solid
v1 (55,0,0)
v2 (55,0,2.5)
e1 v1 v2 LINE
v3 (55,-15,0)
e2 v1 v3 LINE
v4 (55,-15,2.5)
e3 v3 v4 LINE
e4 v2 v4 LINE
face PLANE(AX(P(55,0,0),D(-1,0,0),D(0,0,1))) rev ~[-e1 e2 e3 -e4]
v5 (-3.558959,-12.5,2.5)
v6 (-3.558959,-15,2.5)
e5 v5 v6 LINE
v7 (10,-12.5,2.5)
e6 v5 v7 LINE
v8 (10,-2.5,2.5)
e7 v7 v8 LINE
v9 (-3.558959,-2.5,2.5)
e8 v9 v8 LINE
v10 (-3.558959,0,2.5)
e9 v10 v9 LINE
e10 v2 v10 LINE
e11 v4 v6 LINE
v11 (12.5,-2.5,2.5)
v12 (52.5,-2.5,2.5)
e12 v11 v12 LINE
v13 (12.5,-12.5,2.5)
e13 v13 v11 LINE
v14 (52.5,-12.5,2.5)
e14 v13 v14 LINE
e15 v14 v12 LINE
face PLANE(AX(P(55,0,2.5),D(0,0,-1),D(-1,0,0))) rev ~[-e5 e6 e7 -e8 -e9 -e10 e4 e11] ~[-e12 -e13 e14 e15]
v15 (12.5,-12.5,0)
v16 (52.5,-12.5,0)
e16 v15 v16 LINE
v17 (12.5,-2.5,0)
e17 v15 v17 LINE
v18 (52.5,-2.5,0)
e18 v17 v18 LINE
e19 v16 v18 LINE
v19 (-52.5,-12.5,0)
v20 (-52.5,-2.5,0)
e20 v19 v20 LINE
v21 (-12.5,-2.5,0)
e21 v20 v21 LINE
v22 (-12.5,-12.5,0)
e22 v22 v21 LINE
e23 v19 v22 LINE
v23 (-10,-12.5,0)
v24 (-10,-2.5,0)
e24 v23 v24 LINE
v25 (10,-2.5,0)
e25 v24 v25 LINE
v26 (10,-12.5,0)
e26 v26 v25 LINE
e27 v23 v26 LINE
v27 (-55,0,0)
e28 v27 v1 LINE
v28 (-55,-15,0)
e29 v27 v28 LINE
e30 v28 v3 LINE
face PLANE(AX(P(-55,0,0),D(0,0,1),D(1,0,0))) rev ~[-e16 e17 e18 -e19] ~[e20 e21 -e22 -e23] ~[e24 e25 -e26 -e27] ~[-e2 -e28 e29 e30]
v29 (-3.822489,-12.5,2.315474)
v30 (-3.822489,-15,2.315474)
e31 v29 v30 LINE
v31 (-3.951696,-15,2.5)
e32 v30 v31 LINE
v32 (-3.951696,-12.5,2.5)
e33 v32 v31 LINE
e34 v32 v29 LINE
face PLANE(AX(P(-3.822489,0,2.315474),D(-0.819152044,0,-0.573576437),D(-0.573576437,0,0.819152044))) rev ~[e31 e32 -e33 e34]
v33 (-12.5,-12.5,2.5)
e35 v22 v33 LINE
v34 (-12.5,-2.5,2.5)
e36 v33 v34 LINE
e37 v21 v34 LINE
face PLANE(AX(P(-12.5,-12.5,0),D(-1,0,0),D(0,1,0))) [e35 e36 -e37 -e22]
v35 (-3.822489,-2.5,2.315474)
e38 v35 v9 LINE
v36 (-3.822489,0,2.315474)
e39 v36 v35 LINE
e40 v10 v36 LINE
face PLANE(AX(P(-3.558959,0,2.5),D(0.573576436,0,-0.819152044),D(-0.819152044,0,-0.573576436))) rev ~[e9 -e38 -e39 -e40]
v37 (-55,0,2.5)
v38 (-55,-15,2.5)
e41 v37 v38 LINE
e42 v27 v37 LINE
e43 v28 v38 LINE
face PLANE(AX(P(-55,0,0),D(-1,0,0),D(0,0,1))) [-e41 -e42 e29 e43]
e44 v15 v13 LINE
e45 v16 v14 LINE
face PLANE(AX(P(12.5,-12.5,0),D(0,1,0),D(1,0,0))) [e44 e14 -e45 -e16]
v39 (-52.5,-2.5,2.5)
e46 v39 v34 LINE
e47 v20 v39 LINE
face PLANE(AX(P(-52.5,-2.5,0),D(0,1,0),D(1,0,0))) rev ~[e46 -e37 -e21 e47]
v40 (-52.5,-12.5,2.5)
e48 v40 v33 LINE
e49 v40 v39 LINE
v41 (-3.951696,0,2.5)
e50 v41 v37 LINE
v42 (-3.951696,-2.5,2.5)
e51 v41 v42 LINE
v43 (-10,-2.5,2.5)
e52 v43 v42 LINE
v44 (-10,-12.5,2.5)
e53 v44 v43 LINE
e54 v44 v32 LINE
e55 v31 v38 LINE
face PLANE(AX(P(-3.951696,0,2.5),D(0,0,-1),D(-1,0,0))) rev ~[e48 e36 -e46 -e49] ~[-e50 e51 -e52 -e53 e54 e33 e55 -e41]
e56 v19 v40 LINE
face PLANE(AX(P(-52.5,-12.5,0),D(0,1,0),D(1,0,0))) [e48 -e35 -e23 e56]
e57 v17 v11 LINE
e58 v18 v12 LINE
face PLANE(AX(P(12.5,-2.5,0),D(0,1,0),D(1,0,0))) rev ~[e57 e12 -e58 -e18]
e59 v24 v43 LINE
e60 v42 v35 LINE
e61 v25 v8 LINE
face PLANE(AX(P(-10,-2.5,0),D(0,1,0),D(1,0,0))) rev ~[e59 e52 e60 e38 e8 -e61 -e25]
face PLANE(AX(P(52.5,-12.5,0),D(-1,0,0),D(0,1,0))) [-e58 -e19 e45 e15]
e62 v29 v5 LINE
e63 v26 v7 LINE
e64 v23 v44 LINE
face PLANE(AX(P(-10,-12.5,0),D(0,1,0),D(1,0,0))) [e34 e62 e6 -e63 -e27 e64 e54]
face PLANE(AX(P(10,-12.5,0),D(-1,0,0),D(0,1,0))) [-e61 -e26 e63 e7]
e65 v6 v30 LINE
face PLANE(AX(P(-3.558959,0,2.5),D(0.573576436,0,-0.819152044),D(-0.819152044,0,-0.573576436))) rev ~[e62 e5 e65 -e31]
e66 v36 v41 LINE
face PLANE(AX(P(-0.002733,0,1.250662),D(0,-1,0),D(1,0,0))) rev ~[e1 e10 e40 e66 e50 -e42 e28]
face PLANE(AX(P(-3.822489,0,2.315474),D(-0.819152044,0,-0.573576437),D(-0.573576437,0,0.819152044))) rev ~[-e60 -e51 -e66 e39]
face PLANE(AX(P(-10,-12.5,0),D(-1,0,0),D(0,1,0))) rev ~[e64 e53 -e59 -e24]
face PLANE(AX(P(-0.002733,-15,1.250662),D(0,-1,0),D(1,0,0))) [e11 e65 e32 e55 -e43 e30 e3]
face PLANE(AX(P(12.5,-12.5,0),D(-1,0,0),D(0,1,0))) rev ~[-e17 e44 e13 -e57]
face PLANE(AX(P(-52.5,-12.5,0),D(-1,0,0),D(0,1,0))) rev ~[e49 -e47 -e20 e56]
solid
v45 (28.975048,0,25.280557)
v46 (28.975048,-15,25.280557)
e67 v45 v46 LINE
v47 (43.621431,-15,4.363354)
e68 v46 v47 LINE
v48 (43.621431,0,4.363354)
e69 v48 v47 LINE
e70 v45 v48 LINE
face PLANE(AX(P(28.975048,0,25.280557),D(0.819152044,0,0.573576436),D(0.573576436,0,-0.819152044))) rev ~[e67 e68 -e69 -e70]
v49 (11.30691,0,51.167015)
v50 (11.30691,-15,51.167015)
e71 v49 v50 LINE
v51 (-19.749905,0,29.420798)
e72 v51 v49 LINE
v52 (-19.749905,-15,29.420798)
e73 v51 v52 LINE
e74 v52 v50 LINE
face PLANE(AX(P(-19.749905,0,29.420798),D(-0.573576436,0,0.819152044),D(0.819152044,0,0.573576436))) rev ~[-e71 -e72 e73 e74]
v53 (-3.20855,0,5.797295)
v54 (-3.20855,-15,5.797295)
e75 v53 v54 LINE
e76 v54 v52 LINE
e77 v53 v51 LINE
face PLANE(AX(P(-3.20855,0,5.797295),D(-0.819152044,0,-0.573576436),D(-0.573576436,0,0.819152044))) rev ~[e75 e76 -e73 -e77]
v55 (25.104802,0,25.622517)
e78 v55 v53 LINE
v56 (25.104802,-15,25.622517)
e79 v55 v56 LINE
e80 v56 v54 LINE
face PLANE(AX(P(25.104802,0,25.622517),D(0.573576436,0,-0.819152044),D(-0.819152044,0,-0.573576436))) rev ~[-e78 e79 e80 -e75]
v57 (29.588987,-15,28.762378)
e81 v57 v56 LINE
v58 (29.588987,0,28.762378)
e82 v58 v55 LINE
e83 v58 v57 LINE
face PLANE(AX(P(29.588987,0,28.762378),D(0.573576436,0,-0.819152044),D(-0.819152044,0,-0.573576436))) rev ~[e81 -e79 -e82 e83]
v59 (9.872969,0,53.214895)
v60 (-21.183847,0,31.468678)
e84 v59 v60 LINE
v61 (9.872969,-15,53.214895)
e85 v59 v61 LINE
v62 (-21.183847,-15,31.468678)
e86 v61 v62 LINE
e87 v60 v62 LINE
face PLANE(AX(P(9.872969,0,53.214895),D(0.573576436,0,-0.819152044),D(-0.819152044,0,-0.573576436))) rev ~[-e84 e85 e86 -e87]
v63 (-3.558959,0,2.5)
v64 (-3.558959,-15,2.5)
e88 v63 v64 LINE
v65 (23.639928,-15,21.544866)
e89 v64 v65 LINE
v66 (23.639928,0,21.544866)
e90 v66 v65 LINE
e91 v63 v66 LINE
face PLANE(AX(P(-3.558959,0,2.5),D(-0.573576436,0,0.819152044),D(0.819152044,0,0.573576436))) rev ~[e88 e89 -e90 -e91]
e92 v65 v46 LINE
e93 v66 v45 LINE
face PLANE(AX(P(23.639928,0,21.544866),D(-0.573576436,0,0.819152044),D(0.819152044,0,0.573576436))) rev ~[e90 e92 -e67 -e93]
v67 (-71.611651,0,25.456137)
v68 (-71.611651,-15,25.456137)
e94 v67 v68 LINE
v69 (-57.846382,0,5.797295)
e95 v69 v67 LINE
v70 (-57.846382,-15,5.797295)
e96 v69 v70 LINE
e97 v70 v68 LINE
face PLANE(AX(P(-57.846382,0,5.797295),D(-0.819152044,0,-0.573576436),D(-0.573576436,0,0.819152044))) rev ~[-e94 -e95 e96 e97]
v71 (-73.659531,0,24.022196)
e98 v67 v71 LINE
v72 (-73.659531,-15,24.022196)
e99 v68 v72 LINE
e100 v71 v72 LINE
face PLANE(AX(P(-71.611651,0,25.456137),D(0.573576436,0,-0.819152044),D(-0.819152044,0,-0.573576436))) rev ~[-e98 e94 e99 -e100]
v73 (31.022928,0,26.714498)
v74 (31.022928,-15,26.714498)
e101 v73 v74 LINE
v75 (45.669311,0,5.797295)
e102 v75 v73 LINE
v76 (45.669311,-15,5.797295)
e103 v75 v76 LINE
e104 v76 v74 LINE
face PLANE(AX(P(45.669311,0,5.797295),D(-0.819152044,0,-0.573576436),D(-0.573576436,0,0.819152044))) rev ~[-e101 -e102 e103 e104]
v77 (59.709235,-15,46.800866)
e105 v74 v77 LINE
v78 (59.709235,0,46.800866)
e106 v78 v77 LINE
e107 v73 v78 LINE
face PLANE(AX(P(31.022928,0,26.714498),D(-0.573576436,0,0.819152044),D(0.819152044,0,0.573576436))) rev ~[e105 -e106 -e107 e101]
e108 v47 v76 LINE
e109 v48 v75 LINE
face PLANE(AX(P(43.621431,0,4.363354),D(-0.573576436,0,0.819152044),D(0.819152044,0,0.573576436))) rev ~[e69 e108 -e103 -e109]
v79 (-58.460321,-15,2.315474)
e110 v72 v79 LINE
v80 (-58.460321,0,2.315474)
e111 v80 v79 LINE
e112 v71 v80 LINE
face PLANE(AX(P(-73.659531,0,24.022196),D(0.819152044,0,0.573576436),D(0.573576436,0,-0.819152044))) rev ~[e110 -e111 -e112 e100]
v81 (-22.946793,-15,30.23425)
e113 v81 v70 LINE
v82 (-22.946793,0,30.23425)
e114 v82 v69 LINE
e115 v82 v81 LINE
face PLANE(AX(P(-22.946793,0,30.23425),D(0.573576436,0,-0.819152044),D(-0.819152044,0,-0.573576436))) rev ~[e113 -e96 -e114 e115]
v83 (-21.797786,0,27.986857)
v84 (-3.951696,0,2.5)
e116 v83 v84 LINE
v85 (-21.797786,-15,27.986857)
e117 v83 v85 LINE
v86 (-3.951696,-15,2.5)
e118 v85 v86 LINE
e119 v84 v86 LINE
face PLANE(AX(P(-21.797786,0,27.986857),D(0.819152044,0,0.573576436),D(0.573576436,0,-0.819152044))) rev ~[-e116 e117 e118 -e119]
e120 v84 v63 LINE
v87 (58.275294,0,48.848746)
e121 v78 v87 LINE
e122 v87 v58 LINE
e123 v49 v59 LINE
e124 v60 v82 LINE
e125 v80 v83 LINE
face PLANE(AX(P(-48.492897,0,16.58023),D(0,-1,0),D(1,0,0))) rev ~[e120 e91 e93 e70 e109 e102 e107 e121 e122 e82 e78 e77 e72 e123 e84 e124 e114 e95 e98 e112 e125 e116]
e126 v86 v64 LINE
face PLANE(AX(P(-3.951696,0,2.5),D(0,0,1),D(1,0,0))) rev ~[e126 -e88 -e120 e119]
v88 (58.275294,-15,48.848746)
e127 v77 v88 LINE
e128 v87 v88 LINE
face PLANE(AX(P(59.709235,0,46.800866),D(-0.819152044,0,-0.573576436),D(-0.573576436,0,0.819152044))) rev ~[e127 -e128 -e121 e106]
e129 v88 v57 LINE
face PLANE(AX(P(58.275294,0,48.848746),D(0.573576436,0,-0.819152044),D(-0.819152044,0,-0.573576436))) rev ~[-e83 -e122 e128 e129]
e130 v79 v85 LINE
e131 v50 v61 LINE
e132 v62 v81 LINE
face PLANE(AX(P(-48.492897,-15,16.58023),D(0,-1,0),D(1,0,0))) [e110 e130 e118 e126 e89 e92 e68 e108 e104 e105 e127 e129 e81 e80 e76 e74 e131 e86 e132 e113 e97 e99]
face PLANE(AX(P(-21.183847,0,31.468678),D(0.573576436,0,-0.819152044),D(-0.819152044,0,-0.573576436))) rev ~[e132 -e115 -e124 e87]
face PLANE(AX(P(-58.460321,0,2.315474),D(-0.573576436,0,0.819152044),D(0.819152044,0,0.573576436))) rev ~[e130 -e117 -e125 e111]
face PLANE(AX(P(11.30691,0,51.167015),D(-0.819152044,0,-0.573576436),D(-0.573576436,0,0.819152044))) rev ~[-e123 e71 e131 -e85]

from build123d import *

# Parameters (mm, degrees)
F1_DEPTH = 15
F0_W     = 2.5
F0_H     = 2.5
F2_W     = 20
F2_H     = 10
F2_W_2   = 40
F3_DEPTH = 70


# Not quite as in the source:
# - a feature of the source that left no trace in its solid (it failed there, or was rolled back) is left out


with BuildPart() as f1:
    # F0 (on Front) → F1 (new body)
    with BuildSketch(Plane.XZ):
        Polygon((-28.0954666037, 23.5771734984), (-21.7977855629, 27.9868572364), (-19.7499054522, 29.4207983273), (-21.1838465431, 31.468678438), (-22.9467930342, 30.2342500155), (-57.8463816277, 5.7972950019), (-71.6116508746, 25.456136839), (-73.6595309853, 24.0221957481), (-58.4603206476, 2.3154738003), align=None)
        Polygon((-21.1838465431, 31.468678438), (-19.7499054522, 29.4207983273), (11.3069104876, 51.1670149611), (9.8729693967, 53.2148950719), align=None)
        Polygon((-21.7977855629, 27.9868572364), (-3.9516960007, 2.5), (-3.5589586403, 2.5), (23.6399283018, 21.5448656678), (28.9750478761, 25.280556611), (31.0229279868, 26.7144977018), (29.588986896, 28.7623778126), (25.1048015935, 25.6225174611), (-3.2085503448, 5.7972950019), (-19.7499054522, 29.4207983273), align=None)
        Polygon((31.0229279868, 26.7144977018), (28.9750478761, 25.280556611), (43.6214308849, 4.363353911), (45.6693109956, 5.7972950019), align=None)
        Polygon((29.588986896, 28.7623778126), (31.0229279868, 26.7144977018), (59.7092352027, 46.8008662578), (58.2752941118, 48.8487463685), align=None)
    extrude(amount=F1_DEPTH)


with BuildPart() as f1b:
    # F0 (on Front) → F1, piece 2 (new body)
    with BuildSketch(Plane.XZ):
        Polygon((-52.5, 2.5), (-52.5, 0), (52.5, 0), (52.5, 2.5), (-3.5589586403, 2.5), (-3.8224893646, 2.3154738003), (-3.9516960007, 2.5), align=None)
        with Locations((53.75, 1.25)):
            Rectangle(F0_W, F0_H)
        with Locations((-53.75, 1.25)):
            Rectangle(F0_W, F0_H)
    extrude(amount=F1_DEPTH)

    # F2 (on Top) → F3 (cut)
    with BuildSketch(Plane.XY):
        with Locations((0, -7.5)):
            Rectangle(F2_W, F2_H)
        with Locations((32.5, -7.5)):
            Rectangle(F2_W_2, F2_H)
        with Locations((-32.5, -7.5)):
            Rectangle(F2_W_2, F2_H)
    extrude(amount=F3_DEPTH, mode=Mode.SUBTRACT)


solid = Compound([f1.part, f1b.part])
